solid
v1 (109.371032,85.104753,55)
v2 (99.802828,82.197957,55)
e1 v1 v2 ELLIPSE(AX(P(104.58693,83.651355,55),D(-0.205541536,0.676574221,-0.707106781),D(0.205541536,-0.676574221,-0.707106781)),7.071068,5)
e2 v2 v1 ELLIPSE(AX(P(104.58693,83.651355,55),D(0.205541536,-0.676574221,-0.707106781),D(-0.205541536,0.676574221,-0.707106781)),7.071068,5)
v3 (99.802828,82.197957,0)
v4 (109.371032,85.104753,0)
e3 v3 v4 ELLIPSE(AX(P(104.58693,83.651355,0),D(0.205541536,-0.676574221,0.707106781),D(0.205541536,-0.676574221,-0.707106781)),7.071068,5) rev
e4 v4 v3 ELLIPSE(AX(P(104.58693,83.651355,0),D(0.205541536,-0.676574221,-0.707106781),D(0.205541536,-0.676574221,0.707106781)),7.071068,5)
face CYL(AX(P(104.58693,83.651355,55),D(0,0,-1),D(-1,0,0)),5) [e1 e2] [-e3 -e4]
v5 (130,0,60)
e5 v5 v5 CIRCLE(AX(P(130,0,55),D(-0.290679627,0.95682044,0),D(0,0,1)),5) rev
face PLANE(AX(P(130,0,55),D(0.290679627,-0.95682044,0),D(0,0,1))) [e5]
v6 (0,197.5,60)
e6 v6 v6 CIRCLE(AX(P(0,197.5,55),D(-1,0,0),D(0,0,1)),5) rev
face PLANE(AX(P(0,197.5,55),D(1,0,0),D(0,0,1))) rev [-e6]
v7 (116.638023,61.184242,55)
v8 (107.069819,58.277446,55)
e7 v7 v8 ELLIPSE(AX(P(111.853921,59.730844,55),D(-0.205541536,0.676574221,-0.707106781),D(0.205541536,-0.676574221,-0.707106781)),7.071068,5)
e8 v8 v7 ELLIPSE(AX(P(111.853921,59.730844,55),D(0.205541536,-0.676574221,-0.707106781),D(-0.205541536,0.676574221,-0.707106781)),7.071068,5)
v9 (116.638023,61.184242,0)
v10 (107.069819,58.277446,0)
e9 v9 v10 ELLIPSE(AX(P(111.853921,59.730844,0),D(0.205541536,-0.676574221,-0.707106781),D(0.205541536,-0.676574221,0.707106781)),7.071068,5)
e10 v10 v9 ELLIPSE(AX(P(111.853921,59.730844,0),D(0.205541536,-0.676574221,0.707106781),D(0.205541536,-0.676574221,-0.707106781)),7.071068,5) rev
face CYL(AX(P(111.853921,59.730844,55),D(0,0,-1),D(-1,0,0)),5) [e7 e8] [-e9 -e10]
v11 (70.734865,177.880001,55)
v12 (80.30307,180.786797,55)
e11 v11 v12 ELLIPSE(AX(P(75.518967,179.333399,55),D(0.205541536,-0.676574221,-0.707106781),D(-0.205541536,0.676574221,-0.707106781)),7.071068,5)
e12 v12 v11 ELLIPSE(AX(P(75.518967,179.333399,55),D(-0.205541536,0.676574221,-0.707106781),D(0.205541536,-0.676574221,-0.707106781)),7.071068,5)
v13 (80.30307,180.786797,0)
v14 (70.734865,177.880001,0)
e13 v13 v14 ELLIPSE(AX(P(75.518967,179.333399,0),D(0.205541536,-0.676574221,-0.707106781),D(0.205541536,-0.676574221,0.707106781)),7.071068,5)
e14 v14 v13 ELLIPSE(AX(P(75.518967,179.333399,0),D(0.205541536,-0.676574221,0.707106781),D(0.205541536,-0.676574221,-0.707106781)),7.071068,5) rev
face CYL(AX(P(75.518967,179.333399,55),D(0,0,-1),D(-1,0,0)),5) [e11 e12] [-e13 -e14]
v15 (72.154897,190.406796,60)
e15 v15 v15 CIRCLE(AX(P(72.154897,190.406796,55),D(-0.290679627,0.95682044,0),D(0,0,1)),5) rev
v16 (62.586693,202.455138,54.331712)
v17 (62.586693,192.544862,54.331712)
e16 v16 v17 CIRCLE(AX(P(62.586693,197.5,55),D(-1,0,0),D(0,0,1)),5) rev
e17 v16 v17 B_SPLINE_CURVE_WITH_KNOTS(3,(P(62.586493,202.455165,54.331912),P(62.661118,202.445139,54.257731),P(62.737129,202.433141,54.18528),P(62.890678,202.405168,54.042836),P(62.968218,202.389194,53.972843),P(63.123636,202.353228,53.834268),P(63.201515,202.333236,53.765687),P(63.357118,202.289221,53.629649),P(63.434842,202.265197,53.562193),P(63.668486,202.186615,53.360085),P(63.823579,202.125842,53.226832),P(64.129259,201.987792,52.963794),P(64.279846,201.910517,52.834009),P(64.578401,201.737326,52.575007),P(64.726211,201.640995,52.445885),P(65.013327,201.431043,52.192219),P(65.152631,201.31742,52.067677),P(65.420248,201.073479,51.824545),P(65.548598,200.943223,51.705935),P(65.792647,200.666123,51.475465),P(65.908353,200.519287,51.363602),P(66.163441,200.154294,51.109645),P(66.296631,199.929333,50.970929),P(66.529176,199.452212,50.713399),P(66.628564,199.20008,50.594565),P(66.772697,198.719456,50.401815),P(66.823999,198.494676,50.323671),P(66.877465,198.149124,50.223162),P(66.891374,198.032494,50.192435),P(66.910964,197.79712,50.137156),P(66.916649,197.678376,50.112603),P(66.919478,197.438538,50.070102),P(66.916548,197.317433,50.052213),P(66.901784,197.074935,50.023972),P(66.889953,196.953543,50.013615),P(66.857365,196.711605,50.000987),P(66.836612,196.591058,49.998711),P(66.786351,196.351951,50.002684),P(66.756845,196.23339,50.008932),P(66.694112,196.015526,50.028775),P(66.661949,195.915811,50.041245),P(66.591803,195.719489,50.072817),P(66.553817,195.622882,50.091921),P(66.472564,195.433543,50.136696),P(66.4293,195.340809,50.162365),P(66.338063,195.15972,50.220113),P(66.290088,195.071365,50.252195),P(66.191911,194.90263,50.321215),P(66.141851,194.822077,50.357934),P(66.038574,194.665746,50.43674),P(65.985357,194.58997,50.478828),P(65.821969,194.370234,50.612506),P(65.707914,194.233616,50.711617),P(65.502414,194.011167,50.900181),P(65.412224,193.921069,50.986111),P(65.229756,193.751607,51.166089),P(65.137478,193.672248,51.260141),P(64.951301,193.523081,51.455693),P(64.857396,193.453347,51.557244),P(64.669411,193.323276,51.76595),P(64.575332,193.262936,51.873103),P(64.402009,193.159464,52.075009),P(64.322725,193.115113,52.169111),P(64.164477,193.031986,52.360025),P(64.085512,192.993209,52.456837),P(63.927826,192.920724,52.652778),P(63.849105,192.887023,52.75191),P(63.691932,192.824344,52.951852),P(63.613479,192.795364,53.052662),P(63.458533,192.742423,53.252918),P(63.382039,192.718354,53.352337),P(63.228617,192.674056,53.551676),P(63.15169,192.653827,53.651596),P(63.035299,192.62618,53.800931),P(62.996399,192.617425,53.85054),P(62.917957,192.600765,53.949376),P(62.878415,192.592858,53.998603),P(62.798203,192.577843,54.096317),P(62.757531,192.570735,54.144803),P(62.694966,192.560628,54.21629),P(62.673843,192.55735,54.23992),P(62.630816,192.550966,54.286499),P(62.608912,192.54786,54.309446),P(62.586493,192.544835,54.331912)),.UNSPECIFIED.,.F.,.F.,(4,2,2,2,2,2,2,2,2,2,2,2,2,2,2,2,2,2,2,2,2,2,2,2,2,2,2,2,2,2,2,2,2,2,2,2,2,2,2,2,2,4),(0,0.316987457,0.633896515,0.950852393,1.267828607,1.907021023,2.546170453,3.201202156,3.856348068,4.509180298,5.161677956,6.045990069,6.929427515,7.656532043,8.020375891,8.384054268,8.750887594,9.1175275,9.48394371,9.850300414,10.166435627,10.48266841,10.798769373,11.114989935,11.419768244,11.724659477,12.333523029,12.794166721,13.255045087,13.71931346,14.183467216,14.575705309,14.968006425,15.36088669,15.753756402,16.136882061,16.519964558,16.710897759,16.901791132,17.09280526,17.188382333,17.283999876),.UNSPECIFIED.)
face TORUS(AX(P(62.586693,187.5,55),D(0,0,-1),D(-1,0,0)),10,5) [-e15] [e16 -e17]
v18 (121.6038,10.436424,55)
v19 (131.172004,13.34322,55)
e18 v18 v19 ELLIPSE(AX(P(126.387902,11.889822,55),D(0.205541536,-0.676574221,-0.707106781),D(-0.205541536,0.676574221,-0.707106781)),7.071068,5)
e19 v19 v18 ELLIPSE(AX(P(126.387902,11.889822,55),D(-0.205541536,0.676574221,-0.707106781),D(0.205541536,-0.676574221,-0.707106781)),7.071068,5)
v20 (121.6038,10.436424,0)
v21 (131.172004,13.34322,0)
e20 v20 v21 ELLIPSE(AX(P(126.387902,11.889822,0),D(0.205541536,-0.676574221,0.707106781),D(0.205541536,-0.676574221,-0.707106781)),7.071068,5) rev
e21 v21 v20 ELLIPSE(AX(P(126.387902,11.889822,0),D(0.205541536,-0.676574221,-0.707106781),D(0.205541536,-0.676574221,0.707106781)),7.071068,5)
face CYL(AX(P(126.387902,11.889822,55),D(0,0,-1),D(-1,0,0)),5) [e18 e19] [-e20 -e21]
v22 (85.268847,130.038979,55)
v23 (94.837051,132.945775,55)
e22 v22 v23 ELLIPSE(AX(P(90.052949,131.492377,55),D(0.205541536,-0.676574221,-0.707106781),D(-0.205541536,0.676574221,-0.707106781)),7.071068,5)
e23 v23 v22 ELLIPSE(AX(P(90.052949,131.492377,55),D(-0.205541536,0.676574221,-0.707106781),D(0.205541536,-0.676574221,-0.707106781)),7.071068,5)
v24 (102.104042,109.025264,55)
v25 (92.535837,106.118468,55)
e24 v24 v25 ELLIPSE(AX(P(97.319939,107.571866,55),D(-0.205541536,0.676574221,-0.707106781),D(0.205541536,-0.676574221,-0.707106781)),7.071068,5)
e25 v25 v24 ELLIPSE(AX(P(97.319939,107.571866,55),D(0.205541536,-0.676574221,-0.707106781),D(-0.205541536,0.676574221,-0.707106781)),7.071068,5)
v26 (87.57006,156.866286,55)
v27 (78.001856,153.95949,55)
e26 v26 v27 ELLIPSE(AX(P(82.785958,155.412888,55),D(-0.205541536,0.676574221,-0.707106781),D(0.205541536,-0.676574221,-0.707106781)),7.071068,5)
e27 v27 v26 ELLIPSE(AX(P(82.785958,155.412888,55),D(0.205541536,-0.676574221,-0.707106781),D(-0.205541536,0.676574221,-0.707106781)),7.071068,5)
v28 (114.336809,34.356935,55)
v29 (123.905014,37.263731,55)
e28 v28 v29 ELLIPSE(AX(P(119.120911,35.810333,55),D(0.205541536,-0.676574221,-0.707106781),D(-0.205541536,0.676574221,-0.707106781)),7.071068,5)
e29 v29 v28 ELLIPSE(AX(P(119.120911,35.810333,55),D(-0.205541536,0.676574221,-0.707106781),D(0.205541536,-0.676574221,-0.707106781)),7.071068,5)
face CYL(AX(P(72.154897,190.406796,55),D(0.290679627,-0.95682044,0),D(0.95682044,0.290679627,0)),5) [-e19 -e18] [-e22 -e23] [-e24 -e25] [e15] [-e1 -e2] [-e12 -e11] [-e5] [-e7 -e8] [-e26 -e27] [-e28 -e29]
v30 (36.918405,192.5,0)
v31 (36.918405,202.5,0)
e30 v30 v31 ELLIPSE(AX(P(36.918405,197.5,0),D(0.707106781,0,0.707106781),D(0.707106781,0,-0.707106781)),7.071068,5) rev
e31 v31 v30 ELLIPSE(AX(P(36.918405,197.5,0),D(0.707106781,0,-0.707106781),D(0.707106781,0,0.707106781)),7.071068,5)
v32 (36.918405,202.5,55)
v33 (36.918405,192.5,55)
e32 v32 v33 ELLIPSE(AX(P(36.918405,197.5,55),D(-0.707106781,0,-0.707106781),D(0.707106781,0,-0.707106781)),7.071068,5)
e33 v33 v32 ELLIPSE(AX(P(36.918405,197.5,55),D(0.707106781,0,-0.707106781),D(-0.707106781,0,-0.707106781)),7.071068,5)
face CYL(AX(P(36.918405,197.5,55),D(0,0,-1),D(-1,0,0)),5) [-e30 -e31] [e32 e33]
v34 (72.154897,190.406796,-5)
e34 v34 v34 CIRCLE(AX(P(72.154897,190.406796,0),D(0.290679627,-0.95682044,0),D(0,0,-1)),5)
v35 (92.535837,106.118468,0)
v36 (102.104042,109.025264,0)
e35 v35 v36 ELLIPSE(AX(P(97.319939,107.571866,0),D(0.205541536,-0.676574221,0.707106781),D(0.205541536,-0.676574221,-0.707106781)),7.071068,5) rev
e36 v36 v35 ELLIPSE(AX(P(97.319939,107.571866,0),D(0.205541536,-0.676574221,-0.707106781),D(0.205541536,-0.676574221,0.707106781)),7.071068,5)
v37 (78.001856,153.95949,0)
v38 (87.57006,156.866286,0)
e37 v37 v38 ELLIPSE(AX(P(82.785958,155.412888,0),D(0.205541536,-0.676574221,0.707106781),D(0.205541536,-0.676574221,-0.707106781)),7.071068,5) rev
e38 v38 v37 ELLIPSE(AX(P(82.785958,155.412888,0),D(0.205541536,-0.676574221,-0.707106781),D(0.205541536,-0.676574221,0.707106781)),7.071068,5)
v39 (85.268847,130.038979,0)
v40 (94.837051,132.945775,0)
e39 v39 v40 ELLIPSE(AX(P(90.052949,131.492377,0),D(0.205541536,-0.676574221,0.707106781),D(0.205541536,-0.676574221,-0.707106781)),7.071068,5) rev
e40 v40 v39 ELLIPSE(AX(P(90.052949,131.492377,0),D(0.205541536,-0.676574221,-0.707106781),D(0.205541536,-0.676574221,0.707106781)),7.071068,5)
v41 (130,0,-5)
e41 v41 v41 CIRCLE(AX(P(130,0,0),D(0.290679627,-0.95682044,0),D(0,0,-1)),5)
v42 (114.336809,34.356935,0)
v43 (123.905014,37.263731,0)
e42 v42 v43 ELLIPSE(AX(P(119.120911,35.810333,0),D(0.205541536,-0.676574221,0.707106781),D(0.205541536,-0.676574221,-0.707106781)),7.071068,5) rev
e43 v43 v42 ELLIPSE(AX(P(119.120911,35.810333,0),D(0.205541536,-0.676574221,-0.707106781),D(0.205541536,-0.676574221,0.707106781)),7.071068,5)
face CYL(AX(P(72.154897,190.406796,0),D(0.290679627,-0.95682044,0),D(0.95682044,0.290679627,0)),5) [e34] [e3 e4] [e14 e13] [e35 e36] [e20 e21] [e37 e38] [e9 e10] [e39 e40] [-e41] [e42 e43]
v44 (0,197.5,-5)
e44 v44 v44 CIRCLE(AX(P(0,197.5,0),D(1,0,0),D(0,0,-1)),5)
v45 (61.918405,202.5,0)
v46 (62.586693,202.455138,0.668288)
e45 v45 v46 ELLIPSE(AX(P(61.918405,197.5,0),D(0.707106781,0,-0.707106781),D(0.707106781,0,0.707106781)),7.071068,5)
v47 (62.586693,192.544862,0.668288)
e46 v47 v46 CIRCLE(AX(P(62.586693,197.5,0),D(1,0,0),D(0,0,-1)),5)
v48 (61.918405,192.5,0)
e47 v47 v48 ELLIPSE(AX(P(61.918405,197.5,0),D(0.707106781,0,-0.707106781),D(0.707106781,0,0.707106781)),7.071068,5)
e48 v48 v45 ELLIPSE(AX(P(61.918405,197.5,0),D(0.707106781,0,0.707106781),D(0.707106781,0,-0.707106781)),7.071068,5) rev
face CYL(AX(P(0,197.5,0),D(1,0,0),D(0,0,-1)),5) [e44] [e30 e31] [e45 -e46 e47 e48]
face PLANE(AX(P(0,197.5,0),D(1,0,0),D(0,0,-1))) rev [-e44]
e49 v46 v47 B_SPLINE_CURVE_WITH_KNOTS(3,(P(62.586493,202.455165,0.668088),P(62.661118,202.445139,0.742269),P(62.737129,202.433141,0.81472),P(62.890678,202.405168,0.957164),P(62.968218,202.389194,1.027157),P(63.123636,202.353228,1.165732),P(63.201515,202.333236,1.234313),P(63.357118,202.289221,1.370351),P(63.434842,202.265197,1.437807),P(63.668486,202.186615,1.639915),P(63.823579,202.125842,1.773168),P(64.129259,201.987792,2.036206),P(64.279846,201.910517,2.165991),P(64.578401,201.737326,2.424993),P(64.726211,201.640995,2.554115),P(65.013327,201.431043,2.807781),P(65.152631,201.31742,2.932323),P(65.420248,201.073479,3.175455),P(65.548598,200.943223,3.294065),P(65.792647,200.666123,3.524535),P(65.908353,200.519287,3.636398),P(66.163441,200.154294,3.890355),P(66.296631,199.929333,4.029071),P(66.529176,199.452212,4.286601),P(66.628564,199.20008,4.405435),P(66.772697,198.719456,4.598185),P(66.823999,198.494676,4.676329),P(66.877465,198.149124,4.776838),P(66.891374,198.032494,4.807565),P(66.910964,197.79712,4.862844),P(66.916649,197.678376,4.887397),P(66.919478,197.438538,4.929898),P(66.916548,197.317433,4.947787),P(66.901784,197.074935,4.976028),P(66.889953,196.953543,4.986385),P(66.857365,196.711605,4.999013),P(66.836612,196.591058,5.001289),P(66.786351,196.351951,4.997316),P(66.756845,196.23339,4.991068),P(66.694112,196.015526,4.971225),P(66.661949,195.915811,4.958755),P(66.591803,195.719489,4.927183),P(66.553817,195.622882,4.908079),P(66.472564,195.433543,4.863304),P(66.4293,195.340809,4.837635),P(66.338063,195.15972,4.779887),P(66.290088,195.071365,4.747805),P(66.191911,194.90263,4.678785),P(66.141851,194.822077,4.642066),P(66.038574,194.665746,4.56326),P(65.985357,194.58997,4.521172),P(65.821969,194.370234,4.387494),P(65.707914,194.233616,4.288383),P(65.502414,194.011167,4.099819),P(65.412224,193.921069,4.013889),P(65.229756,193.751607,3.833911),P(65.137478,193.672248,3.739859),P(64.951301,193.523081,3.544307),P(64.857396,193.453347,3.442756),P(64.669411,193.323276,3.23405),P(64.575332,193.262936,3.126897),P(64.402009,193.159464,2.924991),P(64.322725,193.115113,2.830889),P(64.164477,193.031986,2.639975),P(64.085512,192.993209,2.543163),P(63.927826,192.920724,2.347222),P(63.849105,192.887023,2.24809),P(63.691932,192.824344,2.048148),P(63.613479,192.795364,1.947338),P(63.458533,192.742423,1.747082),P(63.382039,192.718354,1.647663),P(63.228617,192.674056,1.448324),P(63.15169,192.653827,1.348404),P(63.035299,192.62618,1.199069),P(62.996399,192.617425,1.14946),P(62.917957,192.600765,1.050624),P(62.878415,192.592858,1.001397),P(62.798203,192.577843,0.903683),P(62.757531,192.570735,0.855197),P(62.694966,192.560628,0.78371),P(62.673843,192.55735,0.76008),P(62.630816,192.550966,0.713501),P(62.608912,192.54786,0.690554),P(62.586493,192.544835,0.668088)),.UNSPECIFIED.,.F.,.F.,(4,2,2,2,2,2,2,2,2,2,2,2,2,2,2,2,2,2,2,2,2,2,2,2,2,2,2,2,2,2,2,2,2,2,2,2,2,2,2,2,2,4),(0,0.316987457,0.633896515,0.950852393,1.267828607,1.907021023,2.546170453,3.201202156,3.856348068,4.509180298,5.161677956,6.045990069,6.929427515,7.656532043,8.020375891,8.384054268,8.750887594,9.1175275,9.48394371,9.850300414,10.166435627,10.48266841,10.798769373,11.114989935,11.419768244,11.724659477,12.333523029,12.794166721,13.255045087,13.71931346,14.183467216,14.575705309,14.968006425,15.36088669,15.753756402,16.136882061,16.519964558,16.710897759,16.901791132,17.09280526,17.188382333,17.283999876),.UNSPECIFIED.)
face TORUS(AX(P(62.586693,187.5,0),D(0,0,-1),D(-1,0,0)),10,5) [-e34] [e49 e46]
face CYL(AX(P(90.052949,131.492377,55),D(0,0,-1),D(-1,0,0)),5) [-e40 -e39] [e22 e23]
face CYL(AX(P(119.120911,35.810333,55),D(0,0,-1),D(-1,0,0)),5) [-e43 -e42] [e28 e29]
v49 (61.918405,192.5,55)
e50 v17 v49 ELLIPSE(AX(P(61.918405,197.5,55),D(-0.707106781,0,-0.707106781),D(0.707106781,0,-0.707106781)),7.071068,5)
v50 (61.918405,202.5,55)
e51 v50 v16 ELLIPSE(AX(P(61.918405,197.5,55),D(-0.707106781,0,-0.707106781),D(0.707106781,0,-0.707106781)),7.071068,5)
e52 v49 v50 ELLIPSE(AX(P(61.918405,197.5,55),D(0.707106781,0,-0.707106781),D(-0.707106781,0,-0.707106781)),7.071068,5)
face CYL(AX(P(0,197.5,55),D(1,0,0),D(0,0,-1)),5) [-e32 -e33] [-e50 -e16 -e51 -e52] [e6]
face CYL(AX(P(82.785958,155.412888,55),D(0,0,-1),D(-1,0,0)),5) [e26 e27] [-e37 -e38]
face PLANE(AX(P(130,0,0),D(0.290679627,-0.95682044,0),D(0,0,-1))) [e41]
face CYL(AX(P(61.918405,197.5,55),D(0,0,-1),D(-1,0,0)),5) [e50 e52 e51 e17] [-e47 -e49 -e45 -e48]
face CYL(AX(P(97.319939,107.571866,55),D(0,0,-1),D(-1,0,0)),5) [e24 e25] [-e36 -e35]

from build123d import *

# Parameters (mm, degrees)
SKETCH2_R             = 5
SKETCH4_R             = 5
BOSS_EXTRUDE1_DEPTH   = 55
CRVPATTERN1_START     = -1e-07
CRVPATTERN1_OUTLINE_R = 5
CRVPATTERN1_DEPTH     = 55.0000001


# Read off the part's stored shape, not the designer's step: CrvPattern1
with BuildPart() as part:
    # Sweep1: sweep along a path in Sketch1
    with BuildLine(Plane.XY) as sweep1_path:
        Line((0, 197.5), (62.586692935, 197.5))
        ThreePointArc((62.586692935, 197.5), (68.542028244, 195.533304511), (72.154897335, 190.406796273))
        Line((72.154897335, 190.406796273), (130, 0))
    # Sketch2 → Sweep1 (sweep)
    with BuildSketch(Plane(origin=(0, 0, 0), x_dir=(0, 0, -1), z_dir=(1, 0, 0))):
        with Locations((0, 197.5)):
            Circle(SKETCH2_R)
    sweep1 = sweep(path=sweep1_path.line)

    # Sketch4 → Boss-Extrude1 (add)
    with BuildSketch(Plane.XY):
        with Locations(Location((126.387902166, 11.889822036, 0), (0, 0, 196.898648694))):
            Circle(SKETCH4_R)
    extrude(amount=BOSS_EXTRUDE1_DEPTH)

    # CrvPattern1 outline → CrvPattern1 (add)
    with BuildSketch(Plane.XY.offset(CRVPATTERN1_START)):
        with Locations((119.120911483, 35.810333034)):
            Circle(CRVPATTERN1_OUTLINE_R)
        with Locations((111.8539208, 59.730844032)):
            Circle(CRVPATTERN1_OUTLINE_R)
        with Locations((104.586930117, 83.65135503)):
            Circle(CRVPATTERN1_OUTLINE_R)
        with Locations((97.319939434, 107.571866029)):
            Circle(CRVPATTERN1_OUTLINE_R)
        with Locations((90.052948751, 131.492377027)):
            Circle(CRVPATTERN1_OUTLINE_R)
        with Locations((82.785958068, 155.412888025)):
            Circle(CRVPATTERN1_OUTLINE_R)
        with Locations((75.518967385, 179.333399023)):
            Circle(CRVPATTERN1_OUTLINE_R)
        with Locations((61.918405072, 197.5)):
            Circle(CRVPATTERN1_OUTLINE_R)
        with Locations((36.918405072, 197.5)):
            Circle(CRVPATTERN1_OUTLINE_R)
    crvpattern1 = extrude(amount=CRVPATTERN1_DEPTH)

    # Mirror1: Sweep1, CrvPattern1 across plane
    add(sweep1.mirror(Plane.XY.offset(27.5)))
    add(crvpattern1.mirror(Plane.XY.offset(27.5)))


solid = part.part
